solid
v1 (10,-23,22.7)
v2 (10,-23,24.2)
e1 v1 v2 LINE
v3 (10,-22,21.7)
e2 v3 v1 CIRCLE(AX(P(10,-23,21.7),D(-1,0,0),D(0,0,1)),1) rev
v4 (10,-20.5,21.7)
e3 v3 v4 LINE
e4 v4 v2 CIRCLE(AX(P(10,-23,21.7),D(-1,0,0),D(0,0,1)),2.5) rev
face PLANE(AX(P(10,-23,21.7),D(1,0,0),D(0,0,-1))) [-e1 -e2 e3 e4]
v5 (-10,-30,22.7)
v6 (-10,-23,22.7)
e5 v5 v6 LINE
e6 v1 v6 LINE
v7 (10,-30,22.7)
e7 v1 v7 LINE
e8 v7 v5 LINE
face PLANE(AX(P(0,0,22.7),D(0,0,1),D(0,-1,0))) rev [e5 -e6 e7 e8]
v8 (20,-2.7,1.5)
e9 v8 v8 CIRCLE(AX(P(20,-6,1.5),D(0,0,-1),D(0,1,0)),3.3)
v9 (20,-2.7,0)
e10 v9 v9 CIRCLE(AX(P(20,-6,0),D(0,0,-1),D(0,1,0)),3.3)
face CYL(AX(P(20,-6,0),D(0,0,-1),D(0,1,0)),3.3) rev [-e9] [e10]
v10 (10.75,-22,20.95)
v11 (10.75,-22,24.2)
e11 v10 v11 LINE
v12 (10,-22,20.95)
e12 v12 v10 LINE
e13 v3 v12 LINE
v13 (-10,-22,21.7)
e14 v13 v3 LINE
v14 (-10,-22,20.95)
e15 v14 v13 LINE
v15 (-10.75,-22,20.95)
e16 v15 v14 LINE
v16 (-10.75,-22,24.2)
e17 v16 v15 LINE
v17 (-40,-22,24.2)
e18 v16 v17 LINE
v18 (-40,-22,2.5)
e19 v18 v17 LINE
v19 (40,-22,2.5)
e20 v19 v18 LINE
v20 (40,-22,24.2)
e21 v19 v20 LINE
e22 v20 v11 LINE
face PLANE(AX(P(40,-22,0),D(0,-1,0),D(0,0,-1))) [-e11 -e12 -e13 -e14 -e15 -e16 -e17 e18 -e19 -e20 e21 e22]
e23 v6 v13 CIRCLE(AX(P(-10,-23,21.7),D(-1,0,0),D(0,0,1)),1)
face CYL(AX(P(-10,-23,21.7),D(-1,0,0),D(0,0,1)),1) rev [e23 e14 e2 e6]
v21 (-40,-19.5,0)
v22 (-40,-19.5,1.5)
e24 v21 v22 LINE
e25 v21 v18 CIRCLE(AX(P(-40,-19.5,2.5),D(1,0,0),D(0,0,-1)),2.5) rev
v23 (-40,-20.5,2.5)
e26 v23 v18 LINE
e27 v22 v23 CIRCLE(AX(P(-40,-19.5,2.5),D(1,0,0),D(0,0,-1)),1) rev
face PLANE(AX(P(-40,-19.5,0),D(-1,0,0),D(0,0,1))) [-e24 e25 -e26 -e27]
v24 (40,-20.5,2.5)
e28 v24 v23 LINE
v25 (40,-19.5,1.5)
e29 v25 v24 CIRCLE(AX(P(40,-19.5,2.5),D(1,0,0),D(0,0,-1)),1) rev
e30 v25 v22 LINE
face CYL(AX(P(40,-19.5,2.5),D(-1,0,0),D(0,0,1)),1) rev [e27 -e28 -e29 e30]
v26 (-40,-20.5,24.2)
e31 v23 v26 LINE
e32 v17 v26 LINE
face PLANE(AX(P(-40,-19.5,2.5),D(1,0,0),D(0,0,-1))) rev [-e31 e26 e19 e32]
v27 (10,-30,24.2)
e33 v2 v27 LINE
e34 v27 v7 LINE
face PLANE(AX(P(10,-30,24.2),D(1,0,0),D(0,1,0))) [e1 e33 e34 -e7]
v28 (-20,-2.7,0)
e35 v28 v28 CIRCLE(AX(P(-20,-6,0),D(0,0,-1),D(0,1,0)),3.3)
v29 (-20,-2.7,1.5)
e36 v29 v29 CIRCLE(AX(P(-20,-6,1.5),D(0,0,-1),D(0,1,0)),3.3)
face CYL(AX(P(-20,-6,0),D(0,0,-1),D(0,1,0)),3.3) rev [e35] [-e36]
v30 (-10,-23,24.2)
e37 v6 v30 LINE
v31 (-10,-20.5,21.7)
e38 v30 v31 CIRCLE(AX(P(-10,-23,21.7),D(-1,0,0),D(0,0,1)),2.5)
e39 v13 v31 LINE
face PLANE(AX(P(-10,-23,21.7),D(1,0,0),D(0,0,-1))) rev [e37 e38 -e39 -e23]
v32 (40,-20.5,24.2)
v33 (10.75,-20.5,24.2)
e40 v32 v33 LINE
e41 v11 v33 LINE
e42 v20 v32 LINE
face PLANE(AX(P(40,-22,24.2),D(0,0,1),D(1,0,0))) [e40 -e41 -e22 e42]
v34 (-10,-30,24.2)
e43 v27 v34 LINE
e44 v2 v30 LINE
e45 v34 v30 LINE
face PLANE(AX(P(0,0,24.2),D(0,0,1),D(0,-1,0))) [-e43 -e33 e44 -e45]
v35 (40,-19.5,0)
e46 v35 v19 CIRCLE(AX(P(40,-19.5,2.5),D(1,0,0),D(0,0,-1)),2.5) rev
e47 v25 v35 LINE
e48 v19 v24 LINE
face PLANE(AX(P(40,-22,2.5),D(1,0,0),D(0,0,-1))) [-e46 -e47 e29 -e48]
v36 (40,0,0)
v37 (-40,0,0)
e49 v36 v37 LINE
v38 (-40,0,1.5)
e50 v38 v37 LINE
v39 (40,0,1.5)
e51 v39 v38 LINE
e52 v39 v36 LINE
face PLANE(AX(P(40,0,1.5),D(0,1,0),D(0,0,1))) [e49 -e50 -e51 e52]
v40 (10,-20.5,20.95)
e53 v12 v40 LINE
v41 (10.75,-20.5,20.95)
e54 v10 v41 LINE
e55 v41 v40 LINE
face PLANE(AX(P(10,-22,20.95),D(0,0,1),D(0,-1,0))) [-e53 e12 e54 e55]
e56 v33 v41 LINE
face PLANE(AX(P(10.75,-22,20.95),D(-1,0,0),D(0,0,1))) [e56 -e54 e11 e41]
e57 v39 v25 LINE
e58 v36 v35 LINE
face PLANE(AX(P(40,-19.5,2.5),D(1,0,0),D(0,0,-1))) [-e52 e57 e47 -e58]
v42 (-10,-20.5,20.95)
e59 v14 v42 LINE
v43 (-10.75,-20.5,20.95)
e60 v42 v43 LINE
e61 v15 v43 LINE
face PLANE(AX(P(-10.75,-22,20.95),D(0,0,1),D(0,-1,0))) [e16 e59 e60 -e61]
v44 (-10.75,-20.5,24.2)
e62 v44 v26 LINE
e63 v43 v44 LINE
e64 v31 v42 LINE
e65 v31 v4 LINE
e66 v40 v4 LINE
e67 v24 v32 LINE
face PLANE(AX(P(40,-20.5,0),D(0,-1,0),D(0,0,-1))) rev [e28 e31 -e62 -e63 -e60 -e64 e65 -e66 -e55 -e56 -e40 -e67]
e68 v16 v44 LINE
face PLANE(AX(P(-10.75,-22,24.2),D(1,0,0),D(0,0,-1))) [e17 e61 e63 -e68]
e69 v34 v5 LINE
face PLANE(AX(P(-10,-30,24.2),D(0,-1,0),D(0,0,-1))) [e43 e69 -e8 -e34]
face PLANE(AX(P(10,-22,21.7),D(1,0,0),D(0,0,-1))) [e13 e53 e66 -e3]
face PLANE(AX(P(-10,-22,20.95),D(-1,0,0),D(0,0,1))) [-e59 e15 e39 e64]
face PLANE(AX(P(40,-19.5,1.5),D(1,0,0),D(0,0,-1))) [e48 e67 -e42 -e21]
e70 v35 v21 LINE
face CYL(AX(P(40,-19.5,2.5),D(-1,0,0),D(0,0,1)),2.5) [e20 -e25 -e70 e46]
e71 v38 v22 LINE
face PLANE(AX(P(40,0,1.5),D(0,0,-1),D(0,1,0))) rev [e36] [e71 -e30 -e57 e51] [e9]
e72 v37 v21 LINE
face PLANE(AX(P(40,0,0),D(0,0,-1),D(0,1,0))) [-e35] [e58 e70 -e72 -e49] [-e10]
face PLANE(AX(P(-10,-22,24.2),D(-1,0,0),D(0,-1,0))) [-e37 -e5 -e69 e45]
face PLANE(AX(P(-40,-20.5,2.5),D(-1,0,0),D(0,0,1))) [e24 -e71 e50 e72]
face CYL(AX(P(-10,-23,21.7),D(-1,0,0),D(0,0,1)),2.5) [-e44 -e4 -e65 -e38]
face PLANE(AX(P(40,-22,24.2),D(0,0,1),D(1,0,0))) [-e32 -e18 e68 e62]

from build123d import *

# Parameters (mm, degrees)
SM_BASE_FLANGE_1_DEPTH            = 40
SM_EDGE_FLANGE_1_STRIP_W          = 8
SM_EDGE_FLANGE_1_STRIP_H          = 1.5
SM_EDGE_FLANGE_1_STRIP_CUT_DEPTH  = 20
SM_EDGE_FLANGE_1_RELIEF_W         = 8.75
SM_EDGE_FLANGE_1_RELIEF_H         = 0.75
SM_EDGE_FLANGE_1_RELIEF_CUT_DEPTH = 1.5
SM_EDGE_FLANGE_1_DEPTH            = 20
HOLE_WIZARD_M6_1_D                = 6.6


# Sheet-metal steps are written as plain solids
with BuildPart() as part:
    # Sketch 1 → 基体-法兰1 (new, symmetric)
    with BuildSketch(Plane(origin=(0, 0, 0), x_dir=(0, 0, -1), z_dir=(1, 0, 0))):
        with BuildLine():
            Line((0, 0), (0, -19.5))
            ThreePointArc((0, -19.5), (-0.732233047, -21.267766953), (-2.5, -22))
            Line((-2.5, -22), (-24.2, -22))
            Line((-24.2, -22), (-24.2, -20.5))
            Line((-24.2, -20.5), (-2.5, -20.5))
            ThreePointArc((-2.5, -20.5), (-1.792893219, -20.207106781), (-1.5, -19.5))
            Line((-1.5, -19.5), (-1.5, 0))
            Line((-1.5, 0), (0, 0))
        make_face()
    extrude(amount=SM_BASE_FLANGE_1_DEPTH, both=True)

    # 边线-法兰1 strip (across the edge) → 边线-法兰1 strip cut (cut)
    with BuildSketch(Plane(origin=(10, -22, 24.2), x_dir=(0, 0, -1), z_dir=(-1, 0, 0))):
        with Locations((-1.5, -0.75)):
            Rectangle(SM_EDGE_FLANGE_1_STRIP_W, SM_EDGE_FLANGE_1_STRIP_H)
    extrude(amount=SM_EDGE_FLANGE_1_STRIP_CUT_DEPTH, mode=Mode.SUBTRACT)

    # 边线-法兰1 relief (on the sheet) → 边线-法兰1 relief cut (cut)
    with BuildSketch(Plane(origin=(10, -22, 21.7), x_dir=(0, 0, -1), z_dir=(0, -1, 0))):
        with Locations((-3.625, 0.375)):
            Rectangle(SM_EDGE_FLANGE_1_RELIEF_W, SM_EDGE_FLANGE_1_RELIEF_H)
        with Locations((-3.625, -20.375)):
            Rectangle(SM_EDGE_FLANGE_1_RELIEF_W, SM_EDGE_FLANGE_1_RELIEF_H)
    extrude(amount=-SM_EDGE_FLANGE_1_RELIEF_CUT_DEPTH, mode=Mode.SUBTRACT)

    # 边线-法兰1 section (across the edge) → 边线-法兰1 (add)
    with BuildSketch(Plane(origin=(10, -22, 24.2), x_dir=(0, 0, -1), z_dir=(-1, 0, 0))):
        with BuildLine():
            Line((0, 1), (0, 8))
            Line((0, 8), (1.5, 8))
            Line((1.5, 8), (1.5, 1))
            ThreePointArc((1.5, 1), (1.792893219, 0.292893219), (2.5, 0))
            Line((2.5, 0), (2.5, -1.5))
            ThreePointArc((2.5, -1.5), (0.732233047, -0.767766953), (0, 1))
        make_face()
    extrude(amount=SM_EDGE_FLANGE_1_DEPTH)

    # M6 间隙孔1 (through all)
    with Locations(Plane(origin=(0, 0, 0), x_dir=(-1, 0, 0), z_dir=(0, 0, -1))):
        with Locations((-20, -6), (20, -6)):
            Hole(HOLE_WIZARD_M6_1_D / 2)


solid = part.part
